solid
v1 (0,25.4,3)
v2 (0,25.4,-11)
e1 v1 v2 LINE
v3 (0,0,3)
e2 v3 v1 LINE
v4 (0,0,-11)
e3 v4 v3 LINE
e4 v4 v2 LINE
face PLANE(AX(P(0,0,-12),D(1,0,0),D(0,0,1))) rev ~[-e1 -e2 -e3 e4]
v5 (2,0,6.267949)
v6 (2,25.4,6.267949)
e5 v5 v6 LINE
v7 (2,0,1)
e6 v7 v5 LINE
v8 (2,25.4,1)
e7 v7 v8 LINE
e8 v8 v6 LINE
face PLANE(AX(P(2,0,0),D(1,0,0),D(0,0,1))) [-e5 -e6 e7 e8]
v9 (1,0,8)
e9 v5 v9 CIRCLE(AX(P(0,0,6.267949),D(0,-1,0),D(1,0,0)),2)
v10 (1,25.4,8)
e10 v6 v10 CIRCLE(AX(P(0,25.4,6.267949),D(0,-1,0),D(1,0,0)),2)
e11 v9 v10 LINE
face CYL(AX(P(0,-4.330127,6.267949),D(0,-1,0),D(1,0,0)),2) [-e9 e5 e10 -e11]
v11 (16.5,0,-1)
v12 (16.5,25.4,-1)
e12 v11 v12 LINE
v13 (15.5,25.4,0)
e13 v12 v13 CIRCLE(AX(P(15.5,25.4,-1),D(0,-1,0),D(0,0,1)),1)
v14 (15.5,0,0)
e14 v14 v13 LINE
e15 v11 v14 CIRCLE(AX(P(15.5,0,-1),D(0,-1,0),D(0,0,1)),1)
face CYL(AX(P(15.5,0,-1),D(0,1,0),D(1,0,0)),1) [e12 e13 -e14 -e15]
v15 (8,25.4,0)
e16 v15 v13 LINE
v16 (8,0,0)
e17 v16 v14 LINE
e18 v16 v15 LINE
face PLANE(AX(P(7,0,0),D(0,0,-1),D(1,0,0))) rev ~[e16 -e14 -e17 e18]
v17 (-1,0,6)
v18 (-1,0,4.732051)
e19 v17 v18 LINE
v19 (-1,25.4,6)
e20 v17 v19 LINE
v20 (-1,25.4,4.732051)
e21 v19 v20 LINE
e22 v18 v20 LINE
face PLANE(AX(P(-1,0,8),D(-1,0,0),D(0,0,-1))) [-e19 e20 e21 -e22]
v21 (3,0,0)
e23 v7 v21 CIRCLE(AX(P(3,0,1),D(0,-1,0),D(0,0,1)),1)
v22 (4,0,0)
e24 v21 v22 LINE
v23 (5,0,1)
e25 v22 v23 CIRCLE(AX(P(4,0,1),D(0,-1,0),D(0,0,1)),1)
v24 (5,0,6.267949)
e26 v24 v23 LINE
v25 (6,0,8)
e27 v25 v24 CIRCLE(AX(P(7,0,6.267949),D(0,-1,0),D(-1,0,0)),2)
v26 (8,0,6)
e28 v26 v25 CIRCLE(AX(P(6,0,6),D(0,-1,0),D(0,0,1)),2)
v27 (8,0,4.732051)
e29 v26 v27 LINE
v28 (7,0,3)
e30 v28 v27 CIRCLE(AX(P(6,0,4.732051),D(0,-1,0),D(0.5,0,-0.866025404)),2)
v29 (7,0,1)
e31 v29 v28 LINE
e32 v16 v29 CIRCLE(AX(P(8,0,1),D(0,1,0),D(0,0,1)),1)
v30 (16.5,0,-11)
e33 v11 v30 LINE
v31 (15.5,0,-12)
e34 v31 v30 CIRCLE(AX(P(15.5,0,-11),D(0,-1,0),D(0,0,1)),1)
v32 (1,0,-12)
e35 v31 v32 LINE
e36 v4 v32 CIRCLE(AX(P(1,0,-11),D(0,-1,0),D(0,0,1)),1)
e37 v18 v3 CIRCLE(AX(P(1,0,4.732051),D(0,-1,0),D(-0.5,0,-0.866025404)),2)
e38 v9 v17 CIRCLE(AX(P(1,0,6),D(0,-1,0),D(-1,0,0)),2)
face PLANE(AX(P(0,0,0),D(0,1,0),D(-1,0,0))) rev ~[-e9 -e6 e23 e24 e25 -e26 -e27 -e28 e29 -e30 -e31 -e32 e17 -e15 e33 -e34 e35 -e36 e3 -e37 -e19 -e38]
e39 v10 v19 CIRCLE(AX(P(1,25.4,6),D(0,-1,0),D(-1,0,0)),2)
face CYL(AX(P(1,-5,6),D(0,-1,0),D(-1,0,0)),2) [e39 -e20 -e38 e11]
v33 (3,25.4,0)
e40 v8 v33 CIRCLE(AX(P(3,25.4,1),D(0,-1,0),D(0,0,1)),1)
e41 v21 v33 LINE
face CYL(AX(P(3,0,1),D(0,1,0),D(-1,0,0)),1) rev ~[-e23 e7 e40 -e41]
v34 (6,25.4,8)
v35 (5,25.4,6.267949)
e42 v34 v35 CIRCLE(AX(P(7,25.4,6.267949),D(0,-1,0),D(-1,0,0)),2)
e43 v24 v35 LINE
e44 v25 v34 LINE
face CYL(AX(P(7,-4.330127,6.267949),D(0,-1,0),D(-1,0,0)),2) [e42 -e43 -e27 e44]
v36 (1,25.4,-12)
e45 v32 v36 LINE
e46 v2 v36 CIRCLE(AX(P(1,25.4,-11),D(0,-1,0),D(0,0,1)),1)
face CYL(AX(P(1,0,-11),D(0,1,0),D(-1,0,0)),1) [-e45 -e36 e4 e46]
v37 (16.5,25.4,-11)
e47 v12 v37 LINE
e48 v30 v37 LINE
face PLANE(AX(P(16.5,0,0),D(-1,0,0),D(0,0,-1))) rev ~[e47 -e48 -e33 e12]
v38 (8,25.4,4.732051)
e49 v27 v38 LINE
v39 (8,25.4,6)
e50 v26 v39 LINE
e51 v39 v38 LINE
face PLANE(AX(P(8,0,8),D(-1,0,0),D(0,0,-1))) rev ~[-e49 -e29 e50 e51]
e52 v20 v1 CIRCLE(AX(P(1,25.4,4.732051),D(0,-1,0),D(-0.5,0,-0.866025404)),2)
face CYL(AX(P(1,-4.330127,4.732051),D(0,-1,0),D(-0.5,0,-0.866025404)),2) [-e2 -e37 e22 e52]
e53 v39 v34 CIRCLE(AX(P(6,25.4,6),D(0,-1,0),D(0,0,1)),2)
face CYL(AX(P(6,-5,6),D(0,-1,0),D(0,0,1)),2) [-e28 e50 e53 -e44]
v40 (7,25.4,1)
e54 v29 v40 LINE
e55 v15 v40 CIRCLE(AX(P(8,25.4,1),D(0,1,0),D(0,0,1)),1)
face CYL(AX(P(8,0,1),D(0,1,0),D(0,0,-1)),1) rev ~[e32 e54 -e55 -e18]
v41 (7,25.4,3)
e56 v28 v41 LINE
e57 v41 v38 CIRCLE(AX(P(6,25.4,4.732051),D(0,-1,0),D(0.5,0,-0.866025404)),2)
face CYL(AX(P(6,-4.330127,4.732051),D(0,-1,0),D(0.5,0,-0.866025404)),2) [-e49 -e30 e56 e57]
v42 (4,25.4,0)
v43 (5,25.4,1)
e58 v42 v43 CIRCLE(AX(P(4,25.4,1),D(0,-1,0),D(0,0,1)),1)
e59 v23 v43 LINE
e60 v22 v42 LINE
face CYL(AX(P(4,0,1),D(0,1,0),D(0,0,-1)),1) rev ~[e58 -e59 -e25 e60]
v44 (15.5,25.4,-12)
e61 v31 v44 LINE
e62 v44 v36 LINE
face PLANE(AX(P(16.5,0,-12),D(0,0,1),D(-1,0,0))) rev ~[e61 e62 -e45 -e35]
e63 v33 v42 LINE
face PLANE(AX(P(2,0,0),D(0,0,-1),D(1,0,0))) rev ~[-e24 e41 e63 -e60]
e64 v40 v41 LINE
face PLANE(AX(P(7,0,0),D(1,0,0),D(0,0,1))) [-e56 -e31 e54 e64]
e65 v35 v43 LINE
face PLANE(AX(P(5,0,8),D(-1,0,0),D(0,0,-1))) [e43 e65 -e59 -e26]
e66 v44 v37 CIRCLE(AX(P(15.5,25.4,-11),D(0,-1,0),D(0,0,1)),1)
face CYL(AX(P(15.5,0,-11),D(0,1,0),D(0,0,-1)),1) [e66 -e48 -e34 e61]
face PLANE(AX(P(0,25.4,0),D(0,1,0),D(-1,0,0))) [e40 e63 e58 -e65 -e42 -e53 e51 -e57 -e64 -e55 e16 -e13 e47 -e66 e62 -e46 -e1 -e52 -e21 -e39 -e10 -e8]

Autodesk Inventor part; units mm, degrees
ref_plane "YZ Plane" through (0, 0, 0) normal (1, 0, 0) x (0, 1, 0)
ref_plane "XZ Plane" through (0, 0, 0) normal (0, 1, 0) x (-1, 0, 0)
ref_plane "XY Plane" through (0, 0, 0) normal (0, 0, 1) x (1, 0, 0)
sketch "Sketch1" plane through (0, 0, 0) normal (0, 1, 0) x (-1, 0, 0)
  line L0 (0, 0) -> (-16.5, 0)
  line L1 (-16.5, 0) -> (-16.5, -12)
  line L2 (-16.5, -12) -> (0, -12)
  line L3 (0, -12) -> (0, 0)
  line L4 (-5, 0) -> (-7, 0)
  line L5 (-7, 0) -> (-7, 8)
  line L6 (-7, 8) -> (-5, 8)
  line L7 (-5, 8) -> (-5, 0)
  line L8 (0, 0) -> (-2, 0)
  line L9 (-2, 0) -> (-2, 8)
  line L10 (-2, 8) -> (0, 8)
  line L11 (0, 8) -> (0, 0)
  line L12 (0, 8) -> (1, 8)
  line L13 (1, 8) -> (1, 3)
  line L14 (1, 3) -> (0, 3)
  line L15 (0, 3) -> (0, 8)
  line L16 (-7, 8) -> (-8, 8)
  line L17 (-8, 8) -> (-8, 3)
  line L18 (-8, 3) -> (-7, 3)
  line L19 (-7, 3) -> (-7, 8)
  dimension "d0" = 16.5
  dimension "d1" = 12
  dimension "d4" = 2
  dimension "d5" = 8
  dimension "d6" = 3
  dimension "d9" = 1
  dimension "d10" = 5
extrude "Extrusion1" add sketch "Sketch1" along normal blind 25.4
fillet "Fillet1" radius 2 4 edges at (8, 12.7, 3) (8, 12.7, 8) (-1, 12.7, 3) (-1, 12.7, 8)
fillet "Fillet2" radius 1 3 edges at (16.5, 12.7, 0) (16.5, 12.7, -12) (0, 12.7, -12)
fillet "Fillet3" radius 1 3 edges at (5, 12.7, 0) (2, 12.7, 0) (7, 12.7, 0)
fillet "Fillet4" radius 2 2 edges at (5, 12.7, 8) (2, 12.7, 8)
properties part number "ledholder"
